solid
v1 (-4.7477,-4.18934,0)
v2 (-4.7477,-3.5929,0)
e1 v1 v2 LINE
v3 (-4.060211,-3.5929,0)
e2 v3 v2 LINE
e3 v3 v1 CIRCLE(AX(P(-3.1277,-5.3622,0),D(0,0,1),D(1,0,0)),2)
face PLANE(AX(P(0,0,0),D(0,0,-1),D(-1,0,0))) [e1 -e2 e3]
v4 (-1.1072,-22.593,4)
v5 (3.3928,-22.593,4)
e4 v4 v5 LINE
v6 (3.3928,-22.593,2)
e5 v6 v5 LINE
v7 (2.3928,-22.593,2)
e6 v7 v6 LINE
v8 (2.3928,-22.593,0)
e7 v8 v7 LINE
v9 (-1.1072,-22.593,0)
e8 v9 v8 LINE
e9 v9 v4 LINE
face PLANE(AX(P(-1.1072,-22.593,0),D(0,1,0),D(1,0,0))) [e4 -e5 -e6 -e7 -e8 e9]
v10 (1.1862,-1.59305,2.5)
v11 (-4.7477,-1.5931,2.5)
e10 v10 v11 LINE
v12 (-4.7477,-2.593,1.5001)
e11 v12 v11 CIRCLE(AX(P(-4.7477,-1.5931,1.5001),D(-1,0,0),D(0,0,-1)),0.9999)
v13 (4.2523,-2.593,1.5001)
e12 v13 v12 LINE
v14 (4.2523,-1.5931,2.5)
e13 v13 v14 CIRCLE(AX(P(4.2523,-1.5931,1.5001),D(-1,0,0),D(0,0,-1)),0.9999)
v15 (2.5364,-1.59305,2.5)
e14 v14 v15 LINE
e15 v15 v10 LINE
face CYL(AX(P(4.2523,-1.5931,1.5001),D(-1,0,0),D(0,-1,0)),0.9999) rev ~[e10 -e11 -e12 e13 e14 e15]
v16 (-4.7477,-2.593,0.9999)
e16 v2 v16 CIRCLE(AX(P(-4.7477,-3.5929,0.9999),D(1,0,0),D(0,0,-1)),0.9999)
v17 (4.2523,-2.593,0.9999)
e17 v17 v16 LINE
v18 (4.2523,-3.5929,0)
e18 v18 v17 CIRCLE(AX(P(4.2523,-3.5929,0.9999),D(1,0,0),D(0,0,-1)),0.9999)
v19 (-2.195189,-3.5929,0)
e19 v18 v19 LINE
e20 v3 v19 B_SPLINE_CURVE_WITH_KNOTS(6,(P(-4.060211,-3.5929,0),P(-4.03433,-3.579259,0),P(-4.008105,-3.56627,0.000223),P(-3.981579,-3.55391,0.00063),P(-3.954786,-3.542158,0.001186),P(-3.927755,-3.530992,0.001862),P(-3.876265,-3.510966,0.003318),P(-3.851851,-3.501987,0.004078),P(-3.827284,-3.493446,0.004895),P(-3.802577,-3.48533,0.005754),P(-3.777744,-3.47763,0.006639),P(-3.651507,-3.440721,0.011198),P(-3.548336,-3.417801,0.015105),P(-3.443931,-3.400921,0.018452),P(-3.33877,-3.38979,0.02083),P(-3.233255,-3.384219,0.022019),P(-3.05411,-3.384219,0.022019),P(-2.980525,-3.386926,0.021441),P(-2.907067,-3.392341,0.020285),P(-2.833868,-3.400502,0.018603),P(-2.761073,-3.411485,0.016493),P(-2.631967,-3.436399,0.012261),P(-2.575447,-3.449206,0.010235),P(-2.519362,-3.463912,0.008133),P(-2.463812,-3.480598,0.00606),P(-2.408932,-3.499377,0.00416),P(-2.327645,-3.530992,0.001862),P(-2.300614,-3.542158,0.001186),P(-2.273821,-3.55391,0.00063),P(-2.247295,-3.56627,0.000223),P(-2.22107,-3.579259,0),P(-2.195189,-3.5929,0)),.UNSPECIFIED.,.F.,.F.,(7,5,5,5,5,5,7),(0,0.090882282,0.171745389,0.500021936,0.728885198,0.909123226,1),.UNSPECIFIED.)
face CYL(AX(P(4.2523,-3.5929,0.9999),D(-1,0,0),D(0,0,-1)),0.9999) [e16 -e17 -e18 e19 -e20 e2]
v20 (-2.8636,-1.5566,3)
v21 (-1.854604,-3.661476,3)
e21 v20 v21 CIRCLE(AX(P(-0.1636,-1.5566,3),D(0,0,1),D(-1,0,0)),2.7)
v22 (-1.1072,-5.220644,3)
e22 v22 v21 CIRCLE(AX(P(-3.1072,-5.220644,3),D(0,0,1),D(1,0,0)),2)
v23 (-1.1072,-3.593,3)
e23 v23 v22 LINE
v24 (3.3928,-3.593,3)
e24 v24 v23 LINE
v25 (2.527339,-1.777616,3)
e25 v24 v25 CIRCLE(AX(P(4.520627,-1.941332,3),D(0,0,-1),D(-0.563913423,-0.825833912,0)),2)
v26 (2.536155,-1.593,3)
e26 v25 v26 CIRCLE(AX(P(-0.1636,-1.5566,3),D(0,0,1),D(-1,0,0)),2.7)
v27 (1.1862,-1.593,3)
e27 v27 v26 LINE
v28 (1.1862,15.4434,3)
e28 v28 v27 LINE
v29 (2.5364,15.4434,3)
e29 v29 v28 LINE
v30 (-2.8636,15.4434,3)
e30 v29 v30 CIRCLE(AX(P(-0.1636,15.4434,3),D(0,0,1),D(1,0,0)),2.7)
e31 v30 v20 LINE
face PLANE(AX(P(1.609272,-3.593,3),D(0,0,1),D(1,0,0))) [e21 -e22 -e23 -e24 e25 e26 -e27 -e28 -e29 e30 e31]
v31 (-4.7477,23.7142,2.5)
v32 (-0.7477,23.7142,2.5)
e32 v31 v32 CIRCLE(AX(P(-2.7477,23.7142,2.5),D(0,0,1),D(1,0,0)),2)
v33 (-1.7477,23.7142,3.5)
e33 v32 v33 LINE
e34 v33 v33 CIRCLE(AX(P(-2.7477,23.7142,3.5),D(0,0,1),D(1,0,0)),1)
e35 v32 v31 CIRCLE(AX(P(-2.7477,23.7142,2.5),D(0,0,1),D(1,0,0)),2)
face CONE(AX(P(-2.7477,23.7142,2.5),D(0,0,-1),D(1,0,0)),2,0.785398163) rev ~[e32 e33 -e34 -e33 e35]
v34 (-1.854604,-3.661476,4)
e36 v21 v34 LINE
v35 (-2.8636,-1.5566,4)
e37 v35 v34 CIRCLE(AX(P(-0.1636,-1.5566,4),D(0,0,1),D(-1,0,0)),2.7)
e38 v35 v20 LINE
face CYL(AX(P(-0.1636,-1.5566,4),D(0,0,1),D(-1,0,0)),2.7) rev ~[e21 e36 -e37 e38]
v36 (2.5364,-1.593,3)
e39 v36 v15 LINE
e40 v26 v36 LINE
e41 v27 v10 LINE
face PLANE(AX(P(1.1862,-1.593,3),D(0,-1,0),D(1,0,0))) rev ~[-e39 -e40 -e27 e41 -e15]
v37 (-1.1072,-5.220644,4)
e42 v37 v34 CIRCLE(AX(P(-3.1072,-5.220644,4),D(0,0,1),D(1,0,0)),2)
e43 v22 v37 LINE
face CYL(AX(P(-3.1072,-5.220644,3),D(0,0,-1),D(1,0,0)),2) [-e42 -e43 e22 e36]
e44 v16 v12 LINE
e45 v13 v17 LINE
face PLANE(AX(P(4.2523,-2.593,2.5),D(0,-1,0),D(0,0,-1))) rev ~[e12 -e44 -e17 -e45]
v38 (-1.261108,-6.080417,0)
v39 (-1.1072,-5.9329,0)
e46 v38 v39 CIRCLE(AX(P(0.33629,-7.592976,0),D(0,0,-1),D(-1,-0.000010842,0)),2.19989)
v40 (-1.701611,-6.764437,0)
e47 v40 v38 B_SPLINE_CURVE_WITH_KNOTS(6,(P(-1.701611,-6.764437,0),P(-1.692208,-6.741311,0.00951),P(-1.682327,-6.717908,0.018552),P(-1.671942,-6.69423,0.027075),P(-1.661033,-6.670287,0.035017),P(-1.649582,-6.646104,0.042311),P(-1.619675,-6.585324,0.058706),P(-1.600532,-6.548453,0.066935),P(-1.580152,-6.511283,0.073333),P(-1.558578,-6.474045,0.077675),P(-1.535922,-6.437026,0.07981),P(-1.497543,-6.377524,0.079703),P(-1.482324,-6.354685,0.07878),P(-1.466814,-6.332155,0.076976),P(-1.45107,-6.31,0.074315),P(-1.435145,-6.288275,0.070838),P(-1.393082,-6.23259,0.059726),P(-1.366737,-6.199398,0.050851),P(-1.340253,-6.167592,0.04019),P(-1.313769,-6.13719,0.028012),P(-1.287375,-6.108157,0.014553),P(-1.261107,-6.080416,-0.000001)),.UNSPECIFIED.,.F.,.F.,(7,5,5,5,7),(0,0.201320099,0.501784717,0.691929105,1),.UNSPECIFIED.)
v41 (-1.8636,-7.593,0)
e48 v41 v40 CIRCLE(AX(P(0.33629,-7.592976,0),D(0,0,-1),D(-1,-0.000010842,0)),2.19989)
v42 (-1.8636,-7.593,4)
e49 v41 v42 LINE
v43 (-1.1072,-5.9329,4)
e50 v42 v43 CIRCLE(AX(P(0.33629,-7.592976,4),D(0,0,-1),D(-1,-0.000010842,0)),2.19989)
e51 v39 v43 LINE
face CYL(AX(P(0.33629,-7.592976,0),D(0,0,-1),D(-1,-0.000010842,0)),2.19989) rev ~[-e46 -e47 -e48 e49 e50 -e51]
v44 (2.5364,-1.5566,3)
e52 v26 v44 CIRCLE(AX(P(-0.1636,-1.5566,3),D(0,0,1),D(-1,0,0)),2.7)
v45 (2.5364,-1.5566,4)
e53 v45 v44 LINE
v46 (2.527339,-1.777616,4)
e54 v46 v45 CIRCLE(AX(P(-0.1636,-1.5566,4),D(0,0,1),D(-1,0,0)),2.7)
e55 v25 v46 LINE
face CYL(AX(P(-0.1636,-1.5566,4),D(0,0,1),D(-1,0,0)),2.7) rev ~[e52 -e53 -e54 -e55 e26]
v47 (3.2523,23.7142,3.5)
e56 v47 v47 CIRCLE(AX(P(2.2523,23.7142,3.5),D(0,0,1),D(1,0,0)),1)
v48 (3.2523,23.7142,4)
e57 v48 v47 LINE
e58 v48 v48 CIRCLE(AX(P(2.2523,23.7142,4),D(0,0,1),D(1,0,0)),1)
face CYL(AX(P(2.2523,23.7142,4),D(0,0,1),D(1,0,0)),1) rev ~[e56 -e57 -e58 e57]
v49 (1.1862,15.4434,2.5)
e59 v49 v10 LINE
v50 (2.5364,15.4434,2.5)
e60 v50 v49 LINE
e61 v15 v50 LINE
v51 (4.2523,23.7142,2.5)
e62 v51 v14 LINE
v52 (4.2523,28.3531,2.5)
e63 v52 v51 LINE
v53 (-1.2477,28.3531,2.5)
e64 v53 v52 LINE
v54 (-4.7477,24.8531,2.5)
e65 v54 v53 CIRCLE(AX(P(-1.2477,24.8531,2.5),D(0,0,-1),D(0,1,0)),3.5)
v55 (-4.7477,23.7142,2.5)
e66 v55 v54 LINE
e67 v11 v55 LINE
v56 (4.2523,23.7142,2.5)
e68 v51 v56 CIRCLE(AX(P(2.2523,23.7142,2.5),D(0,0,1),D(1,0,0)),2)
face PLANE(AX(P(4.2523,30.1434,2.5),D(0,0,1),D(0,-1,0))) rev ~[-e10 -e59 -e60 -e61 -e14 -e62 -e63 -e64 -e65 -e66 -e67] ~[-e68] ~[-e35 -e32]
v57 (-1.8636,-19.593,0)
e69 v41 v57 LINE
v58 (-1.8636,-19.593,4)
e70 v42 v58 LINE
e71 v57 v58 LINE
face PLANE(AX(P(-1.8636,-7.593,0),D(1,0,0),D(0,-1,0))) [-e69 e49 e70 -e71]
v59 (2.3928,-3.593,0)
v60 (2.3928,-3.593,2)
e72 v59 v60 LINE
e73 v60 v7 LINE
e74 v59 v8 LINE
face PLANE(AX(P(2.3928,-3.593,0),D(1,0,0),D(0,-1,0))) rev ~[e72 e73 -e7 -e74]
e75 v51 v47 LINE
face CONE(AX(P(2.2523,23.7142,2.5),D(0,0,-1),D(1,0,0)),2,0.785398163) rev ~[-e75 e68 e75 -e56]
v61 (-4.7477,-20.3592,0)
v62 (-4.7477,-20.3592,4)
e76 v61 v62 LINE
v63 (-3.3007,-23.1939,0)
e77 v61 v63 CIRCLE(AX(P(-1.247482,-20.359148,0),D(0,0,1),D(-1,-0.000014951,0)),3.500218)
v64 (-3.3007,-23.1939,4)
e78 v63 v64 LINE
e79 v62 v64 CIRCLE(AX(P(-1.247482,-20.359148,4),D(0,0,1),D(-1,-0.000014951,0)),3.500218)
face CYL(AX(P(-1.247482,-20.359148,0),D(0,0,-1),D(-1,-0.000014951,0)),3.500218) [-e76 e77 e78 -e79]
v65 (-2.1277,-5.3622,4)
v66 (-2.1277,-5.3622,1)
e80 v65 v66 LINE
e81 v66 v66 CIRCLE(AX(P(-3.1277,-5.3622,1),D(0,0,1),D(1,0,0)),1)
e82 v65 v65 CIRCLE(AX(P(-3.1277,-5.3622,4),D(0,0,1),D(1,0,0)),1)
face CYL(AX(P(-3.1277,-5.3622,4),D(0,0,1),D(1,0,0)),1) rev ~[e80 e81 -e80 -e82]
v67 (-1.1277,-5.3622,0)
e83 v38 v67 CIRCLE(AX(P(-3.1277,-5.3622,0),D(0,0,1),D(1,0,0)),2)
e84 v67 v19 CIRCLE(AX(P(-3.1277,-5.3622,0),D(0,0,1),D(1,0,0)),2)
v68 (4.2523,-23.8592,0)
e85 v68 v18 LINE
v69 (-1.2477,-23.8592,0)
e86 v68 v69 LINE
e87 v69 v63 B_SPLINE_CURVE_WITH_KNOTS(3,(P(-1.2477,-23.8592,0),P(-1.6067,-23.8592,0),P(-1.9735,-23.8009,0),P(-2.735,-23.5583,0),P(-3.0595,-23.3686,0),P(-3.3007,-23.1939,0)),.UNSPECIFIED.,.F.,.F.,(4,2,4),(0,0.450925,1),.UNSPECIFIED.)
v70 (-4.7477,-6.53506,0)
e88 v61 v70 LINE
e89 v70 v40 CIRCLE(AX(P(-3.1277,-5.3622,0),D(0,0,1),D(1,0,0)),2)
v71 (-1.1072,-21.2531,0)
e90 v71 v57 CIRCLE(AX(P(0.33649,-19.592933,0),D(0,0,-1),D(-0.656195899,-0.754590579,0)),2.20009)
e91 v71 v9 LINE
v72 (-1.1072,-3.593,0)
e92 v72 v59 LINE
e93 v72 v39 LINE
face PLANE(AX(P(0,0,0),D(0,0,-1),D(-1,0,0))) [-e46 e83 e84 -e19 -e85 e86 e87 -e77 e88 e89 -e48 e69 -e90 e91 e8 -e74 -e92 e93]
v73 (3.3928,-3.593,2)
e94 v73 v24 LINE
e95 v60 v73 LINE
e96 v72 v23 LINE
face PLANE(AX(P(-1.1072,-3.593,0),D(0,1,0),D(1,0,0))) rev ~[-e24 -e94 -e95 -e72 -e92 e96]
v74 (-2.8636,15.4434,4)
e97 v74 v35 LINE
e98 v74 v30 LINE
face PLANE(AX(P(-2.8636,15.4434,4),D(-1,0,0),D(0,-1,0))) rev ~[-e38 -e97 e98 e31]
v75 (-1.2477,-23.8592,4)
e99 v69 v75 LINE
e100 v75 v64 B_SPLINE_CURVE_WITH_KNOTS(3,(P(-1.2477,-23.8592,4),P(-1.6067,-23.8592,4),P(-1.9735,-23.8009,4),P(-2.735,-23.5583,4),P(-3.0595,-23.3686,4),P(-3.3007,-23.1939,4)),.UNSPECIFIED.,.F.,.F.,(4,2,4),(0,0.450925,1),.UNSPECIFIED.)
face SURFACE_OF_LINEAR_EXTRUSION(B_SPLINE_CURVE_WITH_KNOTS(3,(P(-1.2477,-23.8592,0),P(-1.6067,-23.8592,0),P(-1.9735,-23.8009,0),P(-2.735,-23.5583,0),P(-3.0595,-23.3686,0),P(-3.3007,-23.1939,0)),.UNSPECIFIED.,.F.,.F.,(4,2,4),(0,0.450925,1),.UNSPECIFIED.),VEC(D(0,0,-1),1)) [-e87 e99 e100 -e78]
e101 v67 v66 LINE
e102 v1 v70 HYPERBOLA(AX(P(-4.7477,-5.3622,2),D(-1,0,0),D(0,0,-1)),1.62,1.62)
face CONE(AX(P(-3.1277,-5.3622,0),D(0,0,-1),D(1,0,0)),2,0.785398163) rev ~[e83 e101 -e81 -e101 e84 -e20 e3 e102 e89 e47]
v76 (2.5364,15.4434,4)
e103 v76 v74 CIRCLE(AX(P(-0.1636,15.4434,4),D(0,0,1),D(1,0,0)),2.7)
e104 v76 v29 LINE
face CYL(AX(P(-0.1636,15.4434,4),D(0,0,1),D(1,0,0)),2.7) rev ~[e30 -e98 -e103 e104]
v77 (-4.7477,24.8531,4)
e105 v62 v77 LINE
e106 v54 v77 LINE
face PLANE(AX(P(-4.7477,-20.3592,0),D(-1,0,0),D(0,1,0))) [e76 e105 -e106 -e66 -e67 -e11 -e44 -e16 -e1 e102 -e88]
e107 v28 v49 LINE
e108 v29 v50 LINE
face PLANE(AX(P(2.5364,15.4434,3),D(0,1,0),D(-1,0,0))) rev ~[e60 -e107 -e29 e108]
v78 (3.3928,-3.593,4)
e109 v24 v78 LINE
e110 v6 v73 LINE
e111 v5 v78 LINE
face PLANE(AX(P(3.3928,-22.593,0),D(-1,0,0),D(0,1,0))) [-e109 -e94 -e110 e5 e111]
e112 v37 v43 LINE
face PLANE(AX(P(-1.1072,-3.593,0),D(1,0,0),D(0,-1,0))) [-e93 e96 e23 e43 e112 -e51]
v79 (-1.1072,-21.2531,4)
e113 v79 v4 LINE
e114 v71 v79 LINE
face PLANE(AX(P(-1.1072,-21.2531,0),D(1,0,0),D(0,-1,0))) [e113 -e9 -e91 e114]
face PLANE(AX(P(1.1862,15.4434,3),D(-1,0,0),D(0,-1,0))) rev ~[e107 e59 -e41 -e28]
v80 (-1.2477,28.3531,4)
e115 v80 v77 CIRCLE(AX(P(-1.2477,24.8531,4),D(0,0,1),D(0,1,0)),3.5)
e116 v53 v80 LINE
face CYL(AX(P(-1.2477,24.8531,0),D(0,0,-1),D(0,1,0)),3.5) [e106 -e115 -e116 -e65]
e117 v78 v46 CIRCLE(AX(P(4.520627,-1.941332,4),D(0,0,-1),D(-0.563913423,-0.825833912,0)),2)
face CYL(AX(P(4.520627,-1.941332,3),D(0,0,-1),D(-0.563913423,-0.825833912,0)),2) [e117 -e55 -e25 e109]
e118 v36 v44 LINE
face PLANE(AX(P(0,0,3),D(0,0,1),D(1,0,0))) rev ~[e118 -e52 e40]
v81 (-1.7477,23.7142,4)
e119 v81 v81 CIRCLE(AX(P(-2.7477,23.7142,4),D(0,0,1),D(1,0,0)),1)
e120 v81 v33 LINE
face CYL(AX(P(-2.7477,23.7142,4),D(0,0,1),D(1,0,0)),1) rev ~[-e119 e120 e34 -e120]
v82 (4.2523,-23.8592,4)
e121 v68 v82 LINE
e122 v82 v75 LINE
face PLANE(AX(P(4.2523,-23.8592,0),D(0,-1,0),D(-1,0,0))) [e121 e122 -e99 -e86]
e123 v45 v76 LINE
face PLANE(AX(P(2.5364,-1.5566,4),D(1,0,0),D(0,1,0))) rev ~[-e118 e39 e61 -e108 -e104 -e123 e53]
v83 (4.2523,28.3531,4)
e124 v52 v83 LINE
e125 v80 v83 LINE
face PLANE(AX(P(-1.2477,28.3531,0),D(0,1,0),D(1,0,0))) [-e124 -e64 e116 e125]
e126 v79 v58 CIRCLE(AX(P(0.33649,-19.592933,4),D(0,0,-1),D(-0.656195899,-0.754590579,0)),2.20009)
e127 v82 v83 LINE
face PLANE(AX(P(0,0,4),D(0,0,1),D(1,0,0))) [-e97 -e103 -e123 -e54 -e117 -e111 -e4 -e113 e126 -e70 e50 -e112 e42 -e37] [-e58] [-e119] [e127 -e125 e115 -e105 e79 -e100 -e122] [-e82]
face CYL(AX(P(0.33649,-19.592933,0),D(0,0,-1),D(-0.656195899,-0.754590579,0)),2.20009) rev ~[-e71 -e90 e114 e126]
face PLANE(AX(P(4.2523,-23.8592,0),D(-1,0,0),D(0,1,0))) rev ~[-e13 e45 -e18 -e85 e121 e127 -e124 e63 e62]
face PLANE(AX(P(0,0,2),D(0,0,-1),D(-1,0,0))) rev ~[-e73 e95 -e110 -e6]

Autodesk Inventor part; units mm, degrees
ref_plane "YZ Plane" through (0, 0, 0) normal (1, 0, 0) x (0, 1, 0)
ref_plane "XZ Plane" through (0, 0, 0) normal (0, 1, 0) x (-1, 0, 0)
ref_plane "XY Plane" through (0, 0, 0) normal (0, 0, 1) x (1, 0, 0)
sketch "草图1" plane through (0, 0, 0) normal (0, 0, 1) x (1, 0, 0)
  point P0 (0, 0)
sketch "草图2" plane through (0, 0, 0) normal (0, 0, 1) x (1, 0, 0)
  arc A0 (-0.8636, -19.593) -> (1.5364, -19.593) centre (0.3364, -19.593) ccw
  line L0 (-0.8636, -19.593) -> (-0.8636, -7.593)
  arc A1 (1.5364, -7.593) -> (-0.8636, -7.593) centre (0.3364, -7.593) ccw
  line L1 (1.5364, -7.593) -> (1.5364, -19.593)
  arc A2 (-1.8636, -1.5566) -> (1.5364, -1.5566) centre (-0.1636, -1.5566) ccw
  line L2 (-1.8636, 15.4434) -> (-1.8636, -1.5566)
  arc A3 (1.5364, 15.4434) -> (-1.8636, 15.4434) centre (-0.1636, 15.4434) ccw
  line L3 (1.5364, 8.4451) -> (1.5364, 15.4434)
  arc A4 (1.3364, 8.2451) -> (1.5364, 8.4451) centre (1.3364, 8.4451) ccw
  line L4 (1.3364, 8.2451) -> (1.2785, 8.2451)
  arc A5 (1.0785, 8.4451) -> (1.2785, 8.2451) centre (1.2785, 8.4451) ccw
  line L5 (1.0785, 8.4451) -> (1.0785, 15.3461)
  arc A6 (1.0785, 15.3461) -> (-1.3205, 15.3461) centre (-0.121, 15.3461) ccw
  line L6 (-1.3205, 15.3461) -> (-1.3205, -1.4976)
  arc A7 (-1.3205, -1.4976) -> (1.0785, -1.4976) centre (-0.121, -1.4976) ccw
  line L7 (1.0785, -1.4976) -> (1.0785, 5.4033)
  arc A8 (1.2785, 5.6033) -> (1.0785, 5.4033) centre (1.2785, 5.4033) ccw
  line L8 (1.2785, 5.6033) -> (1.3364, 5.6033)
  arc A9 (1.5364, 5.4033) -> (1.3364, 5.6033) centre (1.3364, 5.4033) ccw
  line L9 (1.5364, -1.5566) -> (1.5364, 5.4033)
  arc A10 (-4.7477, -20.3592) -> (-3.3007, -23.1939) centre (-1.2477, -20.3592) ccw
  spline S0 degree 3 poles (-1.2477, -23.8592) (-1.6067, -23.8592) (-1.9735, -23.8009) (-2.735, -23.5583) (-3.0595, -23.3686) (-3.3007, -23.1939) knots 0 0 0 0 0.450925 0.450925 1 1 1 1
  line L10 (5.2523, -23.8592) -> (-1.2477, -23.8592)
  line L11 (5.2523, 28.3531) -> (5.2523, -23.8592)
  line L12 (-1.2477, 28.3531) -> (5.2523, 28.3531)
  arc A11 (-1.2477, 28.3531) -> (-4.7477, 24.8531) centre (-1.2477, 24.8531) ccw
  line L13 (-4.7477, -20.3592) -> (-4.7477, 24.8531)
  line L14 (4.2523, -23.8592) -> (4.2523, 28.3531)
  line L15 (5.2523, 28.3531) -> (4.2523, 28.3531)
  line L16 (5.2523, -23.8592) -> (5.2523, 28.3531)
  line L17 (4.2523, -23.8592) -> (5.2523, -23.8592)
  point P0 (0, 0)
extrude "拉伸1" add sketch "草图2" along normal blind 4 contours L0 A1 L1 A0 | L2 A3 L3 A4 L4 A5 L5 A6 L6 A7 L7 A8 L8 A9 L9 A2 | L13 A11 L12 L14 L10 S0 A10
sketch "草图3" plane through (0, 0, 4) normal (0, 0, 1) x (1, 0, 0)
  point P0 (0, 0)
sketch "草图4" plane through (0, 0, 0) normal (0, 0, -1) x (-1, 0, 0)
  line L0 (-3.3928, -22.593) -> (-3.3928, -3.4829)
  line L1 (-3.3928, -3.4829) -> (-4.2523, -3.4829)
  line L2 (-4.2523, -3.4829) -> (-4.2523, -23.8592)
  line L3 (-4.2523, -23.8592) -> (1.2477, -23.8592)
  spline S0 degree 3 poles (1.2477, -23.8592) (1.6878, -23.8592) (2.1571, -23.7712) (2.6422, -23.5699) (2.6953, -23.5463) (2.7477, -23.5215) knots 0 0 0 0 0.889543 0.889543 1 1 1 1
  line L4 (2.7477, -23.5215) -> (2.7477, -3.4829)
  line L5 (2.7477, -3.4829) -> (1.1072, -3.4829)
  line L6 (1.1072, -3.4829) -> (1.1072, -5.9329)
  arc A0 (1.8636, -7.593) -> (1.1072, -5.9329) centre (-0.3364, -7.593) ccw
  line L7 (1.8636, -7.593) -> (1.8636, -19.593)
  arc A1 (1.1072, -21.2531) -> (1.8636, -19.593) centre (-0.3364, -19.593) ccw
  line L8 (1.1072, -21.2531) -> (1.1072, -22.593)
  line L9 (1.1072, -22.593) -> (-3.3928, -22.593)
  line L10 (1.1072, -3.593) -> (-3.3928, -3.593)
  point P0 (0, 0)
extrude "拉伸2" cut sketch "草图4" against normal blind 4 contours L0 L10 L6 A0 L7 A1 L8 L9
sketch "草图5" plane through (0, 0, 0) normal (0, 0, -1) x (-1, 0, 0)
  line L0 (-2.3928, -3.593) -> (-2.3928, -22.593) projected
  line L1 (-2.3928, -3.593) -> (-3.3928, -3.593) projected
  line L2 (-3.3928, -22.593) -> (-3.3928, -3.593) projected
  line L3 (-2.3928, -22.593) -> (-3.3928, -22.593) projected
  point P0 (0, 0)
extrude "拉伸3" add sketch "草图5" against normal blind 2
sketch "草图6" plane through (4.2523, -23.8592, 0) normal (1, 0, 0) x (0, 0, -1)
  line L0 (0.0883, 54.0026) -> (-2.5, 54.0026)
  line L1 (-2.5, 54.0026) -> (-2.5, 21.2662)
  line L2 (-2.5, 21.2662) -> (0.0883, 21.2662)
  line L3 (0.0883, 21.2662) -> (0.0883, 54.0026)
  line L4 (1, 20.2662) -> (-3, 20.2662) projected
  line L5 (-4, 0) -> (-4, 52.2123) projected
  point P0 (0, 23.8592)
  point P1 (-1, 20.2662)
  dimension "d6" = 1
  dimension "d7" = 1.5
extrude "拉伸4" cut sketch "草图6" against normal blind 33
fillet "圆角1" radius 1 2 edges at (-0.2477, -2.593, 2.5) (-0.2477, -2.593, 0)
sketch "草图7" plane through (0, 0, 4) normal (0, 0, 1) x (1, 0, 0)
  arc A0 (-1.8636, -1.5566) -> (1.5364, -1.5566) centre (-0.1636, -1.5566) ccw projected
  line L0 (-1.8636, 15.4434) -> (-1.8636, -1.5566) projected
  line L1 (1.5364, -1.5566) -> (1.5364, 5.4033) projected
  line L2 (1.379, -1.5758) -> (1.379, 15.4242) projected
  arc A1 (1.5364, 15.4434) -> (-1.8636, 15.4434) centre (-0.1636, 15.4434) ccw projected
  line L3 (1.5364, -1.5566) -> (1.5364, 15.4434) projected
  line L4 (-2.8636, 15.4434) -> (-2.8636, -1.5566)
  arc A2 (-2.8636, -1.5566) -> (2.5364, -1.5566) centre (-0.1636, -1.5566) ccw
  line L5 (2.5364, -1.5566) -> (2.5364, 15.4434)
  arc A3 (2.5364, 15.4434) -> (-2.8636, 15.4434) centre (-0.1636, 15.4434) ccw
  point P0 (0, 0)
  dimension "d11" = 1
extrude "拉伸5" cut sketch "草图7" against normal blind 1 contours L0 A1 L3 L1 A0 | A3 L5 A2 L4
fillet "圆角2" radius 2 2 edges at (-1.1072, -4.0864, 3.5) (1.6093, -3.593, 3.5)
sketch "草图8" plane through (0, 0, 3) normal (0, 0, 1) x (1, 0, 0)
  arc A0 (2.5364, 15.4434) -> (-2.8636, 15.4434) centre (-0.1636, 15.4434) ccw projected
  line L0 (2.5364, 15.4434) -> (1.1862, 15.4434)
  line L1 (1.1862, 15.4434) -> (1.1862, -1.593)
  line L2 (1.1862, -1.593) -> (2.5364, -1.593)
  line L3 (2.5364, -1.593) -> (2.5364, 15.4434)
  line L4 (-4.7477, -1.593) -> (4.2523, -1.593) projected
  point P0 (0, 0)
extrude "拉伸6" cut sketch "草图8" against normal blind 1
sketch "草图9" plane through (0, 0, 4) normal (0, 0, 1) x (1, 0, 0)
  point P0 (0, 0)
sketch "草图10" plane through (0, 0, 4) normal (0, 0, 1) x (1, 0, 0)
  circle A0 centre (-2.7477, 23.7142) radius 1
  circle A1 centre (2.2523, 23.7142) radius 1
  line L0 (4.2523, -23.8592) -> (4.2523, 28.3531) projected
  line L1 (-4.7477, 24.8531) -> (-4.7477, -20.3592) projected
  circle A2 centre (-3.1277, -5.3622) radius 1
  point P0 (0, 0)
  dimension "d17" = 2
  dimension "d18" = 2
  dimension "d19" = 2
  dimension "d20" = 2
  dimension "d21" = 2
extrude "拉伸7" cut sketch "草图10" against normal blind 9.5
chamfer "倒角1" distance 1 angle 45 3 edges at (-3.7477, 23.7142, 2.5) (1.2523, 23.7142, 2.5) (-4.1277, -5.3622, 0)
properties part number "指纹安装板"
